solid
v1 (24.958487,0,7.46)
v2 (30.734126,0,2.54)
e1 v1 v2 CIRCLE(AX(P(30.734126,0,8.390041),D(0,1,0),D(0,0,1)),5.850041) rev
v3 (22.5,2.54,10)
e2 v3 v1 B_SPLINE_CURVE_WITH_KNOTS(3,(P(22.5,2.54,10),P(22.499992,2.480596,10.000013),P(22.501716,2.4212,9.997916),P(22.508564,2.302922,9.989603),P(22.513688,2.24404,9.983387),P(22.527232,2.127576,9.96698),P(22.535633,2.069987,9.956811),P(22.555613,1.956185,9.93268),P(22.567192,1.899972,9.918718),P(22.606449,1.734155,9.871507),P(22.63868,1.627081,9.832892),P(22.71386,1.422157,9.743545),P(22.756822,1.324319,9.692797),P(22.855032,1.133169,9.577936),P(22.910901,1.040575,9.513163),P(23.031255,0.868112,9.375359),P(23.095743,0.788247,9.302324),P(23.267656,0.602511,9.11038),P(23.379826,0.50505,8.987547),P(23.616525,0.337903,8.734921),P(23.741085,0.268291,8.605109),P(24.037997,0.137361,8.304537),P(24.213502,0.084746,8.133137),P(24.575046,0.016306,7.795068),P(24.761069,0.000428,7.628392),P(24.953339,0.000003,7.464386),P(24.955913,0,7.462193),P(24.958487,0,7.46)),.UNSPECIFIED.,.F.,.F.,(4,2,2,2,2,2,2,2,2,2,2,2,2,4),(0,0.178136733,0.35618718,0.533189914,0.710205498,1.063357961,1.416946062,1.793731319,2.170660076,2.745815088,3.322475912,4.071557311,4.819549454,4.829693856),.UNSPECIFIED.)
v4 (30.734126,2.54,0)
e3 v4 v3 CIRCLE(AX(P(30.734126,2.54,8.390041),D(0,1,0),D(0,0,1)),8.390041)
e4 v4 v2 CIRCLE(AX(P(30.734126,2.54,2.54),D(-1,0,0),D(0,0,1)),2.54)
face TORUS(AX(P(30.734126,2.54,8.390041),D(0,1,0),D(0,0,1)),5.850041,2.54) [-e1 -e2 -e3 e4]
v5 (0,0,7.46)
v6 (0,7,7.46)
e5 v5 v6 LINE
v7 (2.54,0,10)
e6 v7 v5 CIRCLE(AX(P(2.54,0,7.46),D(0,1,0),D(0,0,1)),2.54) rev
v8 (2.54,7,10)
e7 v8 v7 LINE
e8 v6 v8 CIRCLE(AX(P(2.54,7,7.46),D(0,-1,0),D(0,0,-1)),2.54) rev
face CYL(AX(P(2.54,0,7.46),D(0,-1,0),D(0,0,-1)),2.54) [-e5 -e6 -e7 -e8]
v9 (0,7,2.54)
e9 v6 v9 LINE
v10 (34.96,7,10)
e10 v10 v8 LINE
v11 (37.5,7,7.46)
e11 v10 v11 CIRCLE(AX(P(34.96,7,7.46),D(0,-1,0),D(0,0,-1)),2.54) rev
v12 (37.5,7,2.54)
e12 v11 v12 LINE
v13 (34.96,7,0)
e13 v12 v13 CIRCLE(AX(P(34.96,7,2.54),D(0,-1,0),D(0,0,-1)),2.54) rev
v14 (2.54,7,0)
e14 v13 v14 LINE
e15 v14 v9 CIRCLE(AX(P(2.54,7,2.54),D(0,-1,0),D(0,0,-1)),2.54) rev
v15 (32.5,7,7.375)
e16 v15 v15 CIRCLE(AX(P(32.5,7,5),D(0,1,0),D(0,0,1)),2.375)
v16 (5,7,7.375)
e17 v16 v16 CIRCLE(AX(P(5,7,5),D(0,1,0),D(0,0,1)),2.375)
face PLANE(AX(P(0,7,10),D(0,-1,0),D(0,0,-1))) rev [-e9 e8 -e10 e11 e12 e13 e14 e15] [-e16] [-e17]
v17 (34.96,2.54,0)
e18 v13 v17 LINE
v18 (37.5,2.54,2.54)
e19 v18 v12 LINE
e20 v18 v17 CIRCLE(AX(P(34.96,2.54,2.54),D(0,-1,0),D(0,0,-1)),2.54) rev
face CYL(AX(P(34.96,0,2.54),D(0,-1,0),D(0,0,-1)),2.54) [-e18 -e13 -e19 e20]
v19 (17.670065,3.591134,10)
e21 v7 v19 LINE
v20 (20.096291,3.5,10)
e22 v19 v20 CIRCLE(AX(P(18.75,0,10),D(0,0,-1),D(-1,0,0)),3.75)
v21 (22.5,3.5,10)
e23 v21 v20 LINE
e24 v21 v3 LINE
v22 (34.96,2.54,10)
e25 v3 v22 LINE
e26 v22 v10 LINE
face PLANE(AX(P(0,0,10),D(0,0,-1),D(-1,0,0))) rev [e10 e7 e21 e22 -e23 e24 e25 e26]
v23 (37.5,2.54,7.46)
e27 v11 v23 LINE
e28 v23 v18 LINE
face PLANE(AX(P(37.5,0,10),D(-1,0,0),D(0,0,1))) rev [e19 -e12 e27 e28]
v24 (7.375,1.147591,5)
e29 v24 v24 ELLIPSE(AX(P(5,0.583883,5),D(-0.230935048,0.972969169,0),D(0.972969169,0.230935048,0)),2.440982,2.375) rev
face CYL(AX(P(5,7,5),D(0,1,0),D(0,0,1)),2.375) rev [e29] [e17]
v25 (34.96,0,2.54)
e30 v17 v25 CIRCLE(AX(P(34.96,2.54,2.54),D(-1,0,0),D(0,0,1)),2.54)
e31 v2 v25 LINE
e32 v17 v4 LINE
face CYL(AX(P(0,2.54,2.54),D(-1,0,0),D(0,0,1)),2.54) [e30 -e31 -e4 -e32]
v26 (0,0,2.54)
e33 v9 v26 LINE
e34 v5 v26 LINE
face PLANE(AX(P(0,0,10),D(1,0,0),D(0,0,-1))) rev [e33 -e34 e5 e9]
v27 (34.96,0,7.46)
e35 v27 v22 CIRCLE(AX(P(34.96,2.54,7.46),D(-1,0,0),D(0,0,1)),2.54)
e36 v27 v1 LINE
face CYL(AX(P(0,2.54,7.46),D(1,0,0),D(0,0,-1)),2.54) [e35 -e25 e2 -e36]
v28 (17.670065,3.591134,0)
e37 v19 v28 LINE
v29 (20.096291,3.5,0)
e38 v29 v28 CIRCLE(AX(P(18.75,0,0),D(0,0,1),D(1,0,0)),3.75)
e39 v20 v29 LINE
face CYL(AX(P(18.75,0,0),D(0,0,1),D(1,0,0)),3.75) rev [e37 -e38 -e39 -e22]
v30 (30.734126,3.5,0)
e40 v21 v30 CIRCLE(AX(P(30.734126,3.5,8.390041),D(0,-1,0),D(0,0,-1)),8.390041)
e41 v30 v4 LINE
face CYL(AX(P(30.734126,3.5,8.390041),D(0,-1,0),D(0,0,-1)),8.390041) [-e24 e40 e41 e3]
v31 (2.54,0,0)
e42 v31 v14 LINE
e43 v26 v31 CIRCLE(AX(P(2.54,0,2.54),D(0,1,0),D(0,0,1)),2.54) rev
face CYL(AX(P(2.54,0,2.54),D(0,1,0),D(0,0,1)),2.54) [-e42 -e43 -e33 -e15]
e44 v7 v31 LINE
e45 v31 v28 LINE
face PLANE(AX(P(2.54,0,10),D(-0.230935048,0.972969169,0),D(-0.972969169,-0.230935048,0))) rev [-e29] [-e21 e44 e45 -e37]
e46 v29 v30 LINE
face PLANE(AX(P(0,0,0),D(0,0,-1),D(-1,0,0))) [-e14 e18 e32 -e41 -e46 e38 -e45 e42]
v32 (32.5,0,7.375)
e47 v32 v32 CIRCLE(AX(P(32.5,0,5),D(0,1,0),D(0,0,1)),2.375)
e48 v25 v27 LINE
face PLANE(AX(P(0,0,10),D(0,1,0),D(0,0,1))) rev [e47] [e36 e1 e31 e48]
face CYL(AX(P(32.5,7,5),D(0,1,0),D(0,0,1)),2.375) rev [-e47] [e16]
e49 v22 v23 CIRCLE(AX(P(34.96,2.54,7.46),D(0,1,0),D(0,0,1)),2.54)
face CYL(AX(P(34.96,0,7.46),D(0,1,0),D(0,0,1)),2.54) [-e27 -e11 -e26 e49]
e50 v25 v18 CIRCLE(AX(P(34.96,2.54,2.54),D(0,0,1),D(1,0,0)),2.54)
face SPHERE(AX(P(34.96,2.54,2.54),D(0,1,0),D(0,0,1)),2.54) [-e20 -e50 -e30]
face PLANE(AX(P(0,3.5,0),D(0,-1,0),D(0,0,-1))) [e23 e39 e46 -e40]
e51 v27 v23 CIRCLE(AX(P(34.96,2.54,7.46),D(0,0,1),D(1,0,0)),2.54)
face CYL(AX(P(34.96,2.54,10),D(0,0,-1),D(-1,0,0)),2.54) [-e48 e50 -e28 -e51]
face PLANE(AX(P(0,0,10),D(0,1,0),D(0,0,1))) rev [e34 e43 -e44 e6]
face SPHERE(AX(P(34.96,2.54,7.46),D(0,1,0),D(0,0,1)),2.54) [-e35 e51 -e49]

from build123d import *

# Parameters (mm, degrees)
SKETCH1_W               = 37.5
SKETCH1_H               = 7
BOSS_EXTRUDE1_DEPTH     = 10
CUT_EXTRUDE1_DEPTH      = 40.436658073
CUT_EXTRUDE1_DEPTH_BACK = 40.436658073
SKETCH2_R               = 3.75
FILLET1_R               = 2.54
F_4_0MM_DOWEL_HOLE1_D   = 4.75
CUT_EXTRUDE2_DEPTH      = 40.436658073
CUT_EXTRUDE2_DEPTH_BACK = 40.436658073
CUT_EXTRUDE3_DEPTH      = 3.5
FILLET2_R               = 2.54


with BuildPart() as part:
    # Sketch1 → Boss-Extrude1 (new body)
    with BuildSketch(Plane.XY):
        with Locations((18.75, 3.5)):
            Rectangle(SKETCH1_W, SKETCH1_H)
    extrude(amount=BOSS_EXTRUDE1_DEPTH)

    # Sketch2 → Cut-Extrude1 (cut, two sides: drawn at the far end of the back side and taken through both)
    with BuildSketch(Plane.XY.offset(10).offset(-CUT_EXTRUDE1_DEPTH_BACK)):
        with Locations((18.75, 0)):
            Circle(SKETCH2_R)
    extrude(amount=CUT_EXTRUDE1_DEPTH + CUT_EXTRUDE1_DEPTH_BACK, mode=Mode.SUBTRACT)

    # Fillet1
    fillet1_edges = [part.edges().sort_by_distance(p)[0] for p in [
        (37.5, 3.5, 10),
        (0, 3.5, 10),
        (37.5, 3.5, 0),
        (0, 3.5, 0),
    ]]
    fillet(fillet1_edges, radius=FILLET1_R)

    # Ø4.0mm Dowel Hole1 (through all)
    with Locations(Plane(origin=(0, 7, 0), x_dir=(1, 0, 0), z_dir=(0, 1, 0))):
        with Locations((5, -5), (32.5, -5)):
            Hole(F_4_0MM_DOWEL_HOLE1_D / 2)

    # Sketch6 → Cut-Extrude2 (cut, two sides: drawn at the far end of the back side and taken through both)
    with BuildSketch(Plane(origin=(0, 0, 0), x_dir=(-1, 0, 0), z_dir=(0, 0, -1)).offset(-CUT_EXTRUDE2_DEPTH_BACK)):
        Polygon((-2.54, 0), (-18.100943668, 3.693403021), (-18.100943668, 0), align=None)
    extrude(amount=CUT_EXTRUDE2_DEPTH + CUT_EXTRUDE2_DEPTH_BACK, mode=Mode.SUBTRACT)

    # Sketch7 → Cut-Extrude3 (cut)
    with BuildSketch(Plane.XZ):
        with BuildLine():
            Line((22.5, 6.78008281), (22.5, 0))
            Line((22.5, 0), (30.734125825, 0))
            ThreePointArc((30.734125825, 0), (25.400966559, 1.913143457), (22.5, 6.78008281))
        make_face()
        with BuildLine():
            Line((22.5, 10), (20.085032716, 10))
            Line((20.085032716, 10), (20.085032716, 0))
            Line((20.085032716, 0), (22.5, 0))
            Line((22.5, 0), (22.5, 6.78008281))
            ThreePointArc((22.5, 6.78008281), (22.34408442, 8.390041405), (22.5, 10))
        make_face()
    extrude(amount=-CUT_EXTRUDE3_DEPTH, mode=Mode.SUBTRACT)

    # Fillet2
    # the kernel refuses this fillet: 2.54 mm, written as the material it takes off along each edge
    with BuildSketch(Plane(origin=(16.15, 0, 10), x_dir=(0, 1, 0), z_dir=(1, 0, 0))) as fillet2_piece_1:
        with BuildLine():
            CenterArc((FILLET2_R, -FILLET2_R), FILLET2_R, 90, 90)
            Line((0, -FILLET2_R), (0, 0))
            Line((0, 0), (FILLET2_R, 0))
        make_face()
    extrude(amount=18.81, mode=Mode.SUBTRACT)
    with BuildSketch(Plane(origin=(34.96, 0, 7.46), x_dir=(0, 0, 1), z_dir=(-1, 0, 0))) as fillet2_piece_2:
        with BuildLine():
            CenterArc((2.54 - FILLET2_R, FILLET2_R), FILLET2_R, 270, 90)
            Line((2.54 - FILLET2_R, 0), (2.54, 0))
            Line((2.54, 0), (2.54, FILLET2_R))
        make_face()
    revolve(axis=Axis((34.96, 0, 7.46), (0, 1, 0)), revolution_arc=90, mode=Mode.SUBTRACT)
    with BuildSketch(Plane(origin=(37.5, 0, 2.54), x_dir=(-1, 0, 0), z_dir=(0, 0, 1))) as fillet2_piece_3:
        with BuildLine():
            CenterArc((FILLET2_R, -FILLET2_R), FILLET2_R, 90, 90)
            Line((0, -FILLET2_R), (0, 0))
            Line((0, 0), (FILLET2_R, 0))
        make_face()
    extrude(amount=4.92, mode=Mode.SUBTRACT)
    with BuildSketch(Plane(origin=(34.96, 0, 2.54), x_dir=(0, 0, -1), z_dir=(-1, 0, 0))) as fillet2_piece_4:
        with BuildLine():
            CenterArc((2.54 - FILLET2_R, -FILLET2_R), FILLET2_R, 0, 90)
            Line((2.54, -FILLET2_R), (2.54, 0))
            Line((2.54, 0), (2.54 - FILLET2_R, 0))
        make_face()
    revolve(axis=Axis((34.96, 0, 2.54), (0, -1, 0)), revolution_arc=90, mode=Mode.SUBTRACT)
    with BuildSketch(Plane(origin=(30.734125825, 0, 0), x_dir=(0, 1, 0), z_dir=(1, 0, 0))) as fillet2_piece_5:
        with BuildLine():
            CenterArc((FILLET2_R, FILLET2_R), FILLET2_R, 180, 90)
            Line((0, FILLET2_R), (0, 0))
            Line((0, 0), (FILLET2_R, 0))
        make_face()
    extrude(amount=4.225874175, mode=Mode.SUBTRACT)
    with BuildSketch(Plane(origin=(30.734125825, 0, 8.390041405), x_dir=(-0.8451253375205291, 0, 0.5345682032077963), z_dir=(0.5345682032077963, 0, 0.8451253375205291))) as fillet2_piece_6:
        with BuildLine():
            CenterArc((8.390041405 - FILLET2_R, -FILLET2_R), FILLET2_R, 0, 90)
            Line((8.390041405, -FILLET2_R), (8.390041405, 0))
            Line((8.390041405, 0), (8.390041405 - FILLET2_R, 0))
        make_face()
    revolve(axis=Axis((30.734125825, 0, 8.390041405), (0, -1, 0)), revolution_arc=122.314632757, mode=Mode.SUBTRACT)


solid = part.part
